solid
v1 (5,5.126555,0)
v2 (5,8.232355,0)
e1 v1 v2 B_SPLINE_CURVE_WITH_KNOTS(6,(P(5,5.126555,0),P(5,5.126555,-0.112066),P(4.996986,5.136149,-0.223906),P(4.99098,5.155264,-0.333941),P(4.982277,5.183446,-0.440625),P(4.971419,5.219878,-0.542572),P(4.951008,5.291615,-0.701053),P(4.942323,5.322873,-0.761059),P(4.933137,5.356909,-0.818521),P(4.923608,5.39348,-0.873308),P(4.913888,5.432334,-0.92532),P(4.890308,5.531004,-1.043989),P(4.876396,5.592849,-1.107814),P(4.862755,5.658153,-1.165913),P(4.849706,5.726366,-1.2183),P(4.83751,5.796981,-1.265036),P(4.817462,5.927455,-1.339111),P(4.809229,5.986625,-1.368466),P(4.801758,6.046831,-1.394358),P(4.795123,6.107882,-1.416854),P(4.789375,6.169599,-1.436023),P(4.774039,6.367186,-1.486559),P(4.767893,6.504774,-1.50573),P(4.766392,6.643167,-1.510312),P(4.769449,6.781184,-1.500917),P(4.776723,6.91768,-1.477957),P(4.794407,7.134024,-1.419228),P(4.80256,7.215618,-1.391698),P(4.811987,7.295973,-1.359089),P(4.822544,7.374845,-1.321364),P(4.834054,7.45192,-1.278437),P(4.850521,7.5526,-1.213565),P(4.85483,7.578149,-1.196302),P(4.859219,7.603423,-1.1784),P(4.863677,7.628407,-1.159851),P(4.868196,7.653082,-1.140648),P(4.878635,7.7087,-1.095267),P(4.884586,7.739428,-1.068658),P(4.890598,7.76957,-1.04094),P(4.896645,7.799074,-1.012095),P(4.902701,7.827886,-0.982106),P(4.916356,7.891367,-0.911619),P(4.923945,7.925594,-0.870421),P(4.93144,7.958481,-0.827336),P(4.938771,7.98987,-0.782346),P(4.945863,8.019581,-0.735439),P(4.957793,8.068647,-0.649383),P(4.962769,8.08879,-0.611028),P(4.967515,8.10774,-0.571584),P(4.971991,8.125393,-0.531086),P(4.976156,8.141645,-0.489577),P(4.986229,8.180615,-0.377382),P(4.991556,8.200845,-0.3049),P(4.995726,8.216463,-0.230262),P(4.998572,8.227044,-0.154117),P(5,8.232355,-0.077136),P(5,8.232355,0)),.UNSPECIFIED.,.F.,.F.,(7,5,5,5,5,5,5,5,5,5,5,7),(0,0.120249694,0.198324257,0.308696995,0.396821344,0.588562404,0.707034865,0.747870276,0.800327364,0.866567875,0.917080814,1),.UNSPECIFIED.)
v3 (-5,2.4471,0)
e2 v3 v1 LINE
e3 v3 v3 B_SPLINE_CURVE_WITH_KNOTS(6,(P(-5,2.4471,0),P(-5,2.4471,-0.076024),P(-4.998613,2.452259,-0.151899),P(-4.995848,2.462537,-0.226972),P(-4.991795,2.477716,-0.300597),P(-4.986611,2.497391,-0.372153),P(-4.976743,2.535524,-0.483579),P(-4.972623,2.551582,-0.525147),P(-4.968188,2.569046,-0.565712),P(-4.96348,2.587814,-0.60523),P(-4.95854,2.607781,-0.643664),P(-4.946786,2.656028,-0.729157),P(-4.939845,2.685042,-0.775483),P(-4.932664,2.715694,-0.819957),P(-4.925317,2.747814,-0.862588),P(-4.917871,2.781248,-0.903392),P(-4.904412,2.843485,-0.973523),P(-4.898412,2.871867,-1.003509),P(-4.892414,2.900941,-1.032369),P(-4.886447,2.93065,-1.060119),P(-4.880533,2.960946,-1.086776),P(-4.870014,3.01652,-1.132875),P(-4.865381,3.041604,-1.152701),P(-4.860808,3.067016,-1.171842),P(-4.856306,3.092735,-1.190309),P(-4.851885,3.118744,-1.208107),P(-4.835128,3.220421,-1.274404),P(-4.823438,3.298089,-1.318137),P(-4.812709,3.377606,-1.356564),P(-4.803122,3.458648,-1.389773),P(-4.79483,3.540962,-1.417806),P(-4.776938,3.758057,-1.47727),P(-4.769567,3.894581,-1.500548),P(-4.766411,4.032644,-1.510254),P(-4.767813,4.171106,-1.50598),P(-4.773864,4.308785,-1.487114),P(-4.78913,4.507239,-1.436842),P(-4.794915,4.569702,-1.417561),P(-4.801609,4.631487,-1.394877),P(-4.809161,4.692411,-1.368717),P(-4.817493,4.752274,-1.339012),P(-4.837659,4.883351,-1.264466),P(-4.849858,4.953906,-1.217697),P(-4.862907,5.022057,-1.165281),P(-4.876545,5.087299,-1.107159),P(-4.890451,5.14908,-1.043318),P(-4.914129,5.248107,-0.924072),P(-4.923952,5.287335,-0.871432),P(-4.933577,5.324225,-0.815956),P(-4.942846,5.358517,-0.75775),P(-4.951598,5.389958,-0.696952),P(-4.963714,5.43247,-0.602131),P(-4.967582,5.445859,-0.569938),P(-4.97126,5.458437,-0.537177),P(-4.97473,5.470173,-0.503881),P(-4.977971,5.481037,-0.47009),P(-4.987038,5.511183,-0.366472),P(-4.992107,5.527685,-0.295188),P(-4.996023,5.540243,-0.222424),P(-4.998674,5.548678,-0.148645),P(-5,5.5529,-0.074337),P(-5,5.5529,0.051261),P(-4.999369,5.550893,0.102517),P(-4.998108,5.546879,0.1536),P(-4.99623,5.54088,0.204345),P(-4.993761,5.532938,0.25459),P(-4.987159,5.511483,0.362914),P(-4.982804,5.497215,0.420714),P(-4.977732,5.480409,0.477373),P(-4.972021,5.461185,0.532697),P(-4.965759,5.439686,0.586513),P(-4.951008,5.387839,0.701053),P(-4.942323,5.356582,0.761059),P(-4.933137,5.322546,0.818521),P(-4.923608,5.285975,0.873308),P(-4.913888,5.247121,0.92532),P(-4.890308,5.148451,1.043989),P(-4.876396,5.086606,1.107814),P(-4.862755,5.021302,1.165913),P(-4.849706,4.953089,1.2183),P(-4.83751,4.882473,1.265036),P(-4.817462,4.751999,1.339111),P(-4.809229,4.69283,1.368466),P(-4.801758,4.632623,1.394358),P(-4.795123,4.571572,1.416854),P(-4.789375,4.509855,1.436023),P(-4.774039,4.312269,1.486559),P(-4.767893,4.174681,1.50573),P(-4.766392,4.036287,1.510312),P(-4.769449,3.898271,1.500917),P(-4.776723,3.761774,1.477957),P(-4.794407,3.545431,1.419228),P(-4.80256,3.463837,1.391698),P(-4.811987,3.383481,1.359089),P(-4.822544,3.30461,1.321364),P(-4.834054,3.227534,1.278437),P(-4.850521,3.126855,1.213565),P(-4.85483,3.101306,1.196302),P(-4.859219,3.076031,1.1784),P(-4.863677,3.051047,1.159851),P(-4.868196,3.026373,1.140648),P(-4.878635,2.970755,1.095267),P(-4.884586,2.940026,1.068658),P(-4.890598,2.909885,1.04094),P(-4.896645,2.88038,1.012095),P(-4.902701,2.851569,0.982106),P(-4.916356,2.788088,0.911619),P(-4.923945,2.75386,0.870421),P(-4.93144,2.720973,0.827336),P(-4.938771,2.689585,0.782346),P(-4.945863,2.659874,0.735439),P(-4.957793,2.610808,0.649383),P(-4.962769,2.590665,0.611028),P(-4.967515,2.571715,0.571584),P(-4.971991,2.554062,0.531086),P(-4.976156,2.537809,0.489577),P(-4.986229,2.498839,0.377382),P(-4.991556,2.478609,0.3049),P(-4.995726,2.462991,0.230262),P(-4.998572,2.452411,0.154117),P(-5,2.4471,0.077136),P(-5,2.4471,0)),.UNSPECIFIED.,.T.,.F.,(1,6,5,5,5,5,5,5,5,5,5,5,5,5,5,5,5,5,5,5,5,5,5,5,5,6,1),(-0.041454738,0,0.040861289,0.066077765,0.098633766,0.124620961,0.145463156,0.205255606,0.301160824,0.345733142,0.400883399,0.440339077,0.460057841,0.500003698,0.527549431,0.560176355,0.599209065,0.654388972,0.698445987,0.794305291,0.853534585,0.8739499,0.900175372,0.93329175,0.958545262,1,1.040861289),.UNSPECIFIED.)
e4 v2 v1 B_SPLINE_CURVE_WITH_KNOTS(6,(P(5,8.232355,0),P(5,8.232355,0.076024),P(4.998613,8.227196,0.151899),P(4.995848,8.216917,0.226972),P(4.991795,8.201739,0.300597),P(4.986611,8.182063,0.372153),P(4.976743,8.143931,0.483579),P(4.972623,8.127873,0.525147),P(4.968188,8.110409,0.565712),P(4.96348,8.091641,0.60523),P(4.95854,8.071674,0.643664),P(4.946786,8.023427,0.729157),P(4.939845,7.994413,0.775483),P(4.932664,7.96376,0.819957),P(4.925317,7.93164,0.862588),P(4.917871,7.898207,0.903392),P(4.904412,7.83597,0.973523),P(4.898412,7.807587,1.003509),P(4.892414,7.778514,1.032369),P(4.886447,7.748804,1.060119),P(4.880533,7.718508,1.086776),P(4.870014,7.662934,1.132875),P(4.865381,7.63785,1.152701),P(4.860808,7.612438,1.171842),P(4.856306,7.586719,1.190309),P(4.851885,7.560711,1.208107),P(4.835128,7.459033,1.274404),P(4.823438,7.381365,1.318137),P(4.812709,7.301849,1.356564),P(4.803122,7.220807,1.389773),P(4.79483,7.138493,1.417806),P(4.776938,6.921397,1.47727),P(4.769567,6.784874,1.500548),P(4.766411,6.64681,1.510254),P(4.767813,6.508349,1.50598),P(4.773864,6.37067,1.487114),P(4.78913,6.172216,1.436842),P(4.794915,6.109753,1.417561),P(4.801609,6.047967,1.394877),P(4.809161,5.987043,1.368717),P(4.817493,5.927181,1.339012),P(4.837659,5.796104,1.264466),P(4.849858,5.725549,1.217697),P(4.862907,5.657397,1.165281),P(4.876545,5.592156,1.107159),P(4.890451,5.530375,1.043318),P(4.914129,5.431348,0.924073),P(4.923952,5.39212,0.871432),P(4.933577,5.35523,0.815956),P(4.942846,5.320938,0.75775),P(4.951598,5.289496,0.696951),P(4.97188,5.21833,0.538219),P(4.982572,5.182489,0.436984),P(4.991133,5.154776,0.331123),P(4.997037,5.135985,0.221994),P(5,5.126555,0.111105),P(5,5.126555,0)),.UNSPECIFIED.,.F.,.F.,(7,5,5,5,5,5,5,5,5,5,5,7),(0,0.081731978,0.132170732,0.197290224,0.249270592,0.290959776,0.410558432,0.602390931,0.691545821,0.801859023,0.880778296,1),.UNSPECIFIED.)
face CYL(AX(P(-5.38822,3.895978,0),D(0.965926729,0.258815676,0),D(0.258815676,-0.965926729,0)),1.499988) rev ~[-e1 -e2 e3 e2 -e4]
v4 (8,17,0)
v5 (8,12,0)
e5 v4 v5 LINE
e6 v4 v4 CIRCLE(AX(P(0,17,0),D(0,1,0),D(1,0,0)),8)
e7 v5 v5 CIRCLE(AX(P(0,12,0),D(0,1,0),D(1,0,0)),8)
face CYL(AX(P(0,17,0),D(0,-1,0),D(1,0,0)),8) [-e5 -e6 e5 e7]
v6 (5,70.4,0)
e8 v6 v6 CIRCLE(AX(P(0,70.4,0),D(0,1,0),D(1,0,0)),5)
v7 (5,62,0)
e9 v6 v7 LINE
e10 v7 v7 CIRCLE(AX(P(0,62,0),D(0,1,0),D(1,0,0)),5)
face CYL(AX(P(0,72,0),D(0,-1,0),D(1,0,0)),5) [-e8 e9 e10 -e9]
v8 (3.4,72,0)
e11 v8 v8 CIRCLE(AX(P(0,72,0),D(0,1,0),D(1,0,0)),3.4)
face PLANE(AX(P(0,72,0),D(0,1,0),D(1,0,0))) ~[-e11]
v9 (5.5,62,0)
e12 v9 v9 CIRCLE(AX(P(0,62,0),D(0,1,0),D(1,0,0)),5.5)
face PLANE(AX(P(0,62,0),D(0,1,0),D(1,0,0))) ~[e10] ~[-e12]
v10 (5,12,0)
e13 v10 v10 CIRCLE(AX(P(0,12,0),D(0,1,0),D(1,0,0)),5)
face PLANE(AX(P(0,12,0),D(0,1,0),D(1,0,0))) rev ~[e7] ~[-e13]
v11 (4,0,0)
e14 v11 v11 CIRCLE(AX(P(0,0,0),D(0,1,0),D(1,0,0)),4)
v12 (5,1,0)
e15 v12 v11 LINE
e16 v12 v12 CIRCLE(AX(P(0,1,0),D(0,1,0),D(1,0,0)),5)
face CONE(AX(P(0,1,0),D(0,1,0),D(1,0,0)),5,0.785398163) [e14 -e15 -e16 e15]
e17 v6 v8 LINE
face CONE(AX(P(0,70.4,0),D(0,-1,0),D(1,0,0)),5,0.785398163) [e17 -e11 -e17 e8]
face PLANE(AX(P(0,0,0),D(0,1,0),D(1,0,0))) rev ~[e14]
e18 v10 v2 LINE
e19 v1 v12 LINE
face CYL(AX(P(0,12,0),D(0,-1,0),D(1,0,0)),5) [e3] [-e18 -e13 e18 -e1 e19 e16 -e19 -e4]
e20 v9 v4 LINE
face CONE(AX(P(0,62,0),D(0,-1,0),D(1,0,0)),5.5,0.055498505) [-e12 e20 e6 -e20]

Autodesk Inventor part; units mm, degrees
ref_plane "YZ Plane" through (0, 0, 0) normal (1, 0, 0) x (0, 1, 0)
ref_plane "XZ Plane" through (0, 0, 0) normal (0, 1, 0) x (-1, 0, 0)
ref_plane "XY Plane" through (0, 0, 0) normal (0, 0, 1) x (1, 0, 0)
sketch "Эскиз1" plane through (0, 0, 0) normal (0, 0, 1) x (1, 0, 0)
  line L0 (0, 0) -> (0, 72)
  line L1 (0, 72) -> (5, 72)
  line L2 (5, 72) -> (5, 62)
  line L3 (5, 62) -> (5.5, 62)
  line L4 (5.5, 62) -> (8, 17)
  line L5 (8, 17) -> (8, 12)
  line L6 (8, 12) -> (5, 12)
  line L7 (5, 12) -> (5, 0)
  line L8 (5, 0) -> (0, 0)
  line L9 (-5, 0) -> (-5, 12) construction
  line L10 (-5, 4) -> (6, 6.9474)
  line L11 (-5, 2.4471) -> (6, 5.3945)
  line L12 (-5, 4) -> (-5, 2.4471)
  line L13 (6, 6.9474) -> (6, 5.3945)
  dimension "d0" = 72
  dimension "d1" = 10
  dimension "d2" = 45
  dimension "d3" = 16
  dimension "d4" = 10
  dimension "d5" = 12
  dimension "d6" = 11
  dimension "d7" = 10
  dimension "d8" = 10
  dimension "d9" = 8
  dimension "d10" = 3
  dimension "d11" = 15
  dimension "d14" = 1
revolve "Вращение1" add sketch "Эскиз1" angle 360 about axis through (0, 0, 0) along (0, 1, 0) contours L0 L11 L7 L8 | L0 L10 L7 L11 | L0 L1 L2 L3 L4 L5 L6 L7 L10
revolve "Вращение2" cut sketch "Эскиз1" angle 360 about axis through (-5, 4, 0) along (0.9659258, 0.258819, 0) contours L11 L12 L10 L0 | L0 L10 L7 L11 | L7 L10 L13 L11
thread "Резьба1" size "M10x1.5" class "6g" standard "ANSI Metric M Profile" length 7.5
chamfer "Фаска1" distance 1.6 angle 45 1 edges at (-5, 72, 0)
chamfer "Фаска2" distance 1 angle 45 1 edges at (-5, 0, 0)
equation "\"d8\" = d4"
properties part number "Рукоятка"
